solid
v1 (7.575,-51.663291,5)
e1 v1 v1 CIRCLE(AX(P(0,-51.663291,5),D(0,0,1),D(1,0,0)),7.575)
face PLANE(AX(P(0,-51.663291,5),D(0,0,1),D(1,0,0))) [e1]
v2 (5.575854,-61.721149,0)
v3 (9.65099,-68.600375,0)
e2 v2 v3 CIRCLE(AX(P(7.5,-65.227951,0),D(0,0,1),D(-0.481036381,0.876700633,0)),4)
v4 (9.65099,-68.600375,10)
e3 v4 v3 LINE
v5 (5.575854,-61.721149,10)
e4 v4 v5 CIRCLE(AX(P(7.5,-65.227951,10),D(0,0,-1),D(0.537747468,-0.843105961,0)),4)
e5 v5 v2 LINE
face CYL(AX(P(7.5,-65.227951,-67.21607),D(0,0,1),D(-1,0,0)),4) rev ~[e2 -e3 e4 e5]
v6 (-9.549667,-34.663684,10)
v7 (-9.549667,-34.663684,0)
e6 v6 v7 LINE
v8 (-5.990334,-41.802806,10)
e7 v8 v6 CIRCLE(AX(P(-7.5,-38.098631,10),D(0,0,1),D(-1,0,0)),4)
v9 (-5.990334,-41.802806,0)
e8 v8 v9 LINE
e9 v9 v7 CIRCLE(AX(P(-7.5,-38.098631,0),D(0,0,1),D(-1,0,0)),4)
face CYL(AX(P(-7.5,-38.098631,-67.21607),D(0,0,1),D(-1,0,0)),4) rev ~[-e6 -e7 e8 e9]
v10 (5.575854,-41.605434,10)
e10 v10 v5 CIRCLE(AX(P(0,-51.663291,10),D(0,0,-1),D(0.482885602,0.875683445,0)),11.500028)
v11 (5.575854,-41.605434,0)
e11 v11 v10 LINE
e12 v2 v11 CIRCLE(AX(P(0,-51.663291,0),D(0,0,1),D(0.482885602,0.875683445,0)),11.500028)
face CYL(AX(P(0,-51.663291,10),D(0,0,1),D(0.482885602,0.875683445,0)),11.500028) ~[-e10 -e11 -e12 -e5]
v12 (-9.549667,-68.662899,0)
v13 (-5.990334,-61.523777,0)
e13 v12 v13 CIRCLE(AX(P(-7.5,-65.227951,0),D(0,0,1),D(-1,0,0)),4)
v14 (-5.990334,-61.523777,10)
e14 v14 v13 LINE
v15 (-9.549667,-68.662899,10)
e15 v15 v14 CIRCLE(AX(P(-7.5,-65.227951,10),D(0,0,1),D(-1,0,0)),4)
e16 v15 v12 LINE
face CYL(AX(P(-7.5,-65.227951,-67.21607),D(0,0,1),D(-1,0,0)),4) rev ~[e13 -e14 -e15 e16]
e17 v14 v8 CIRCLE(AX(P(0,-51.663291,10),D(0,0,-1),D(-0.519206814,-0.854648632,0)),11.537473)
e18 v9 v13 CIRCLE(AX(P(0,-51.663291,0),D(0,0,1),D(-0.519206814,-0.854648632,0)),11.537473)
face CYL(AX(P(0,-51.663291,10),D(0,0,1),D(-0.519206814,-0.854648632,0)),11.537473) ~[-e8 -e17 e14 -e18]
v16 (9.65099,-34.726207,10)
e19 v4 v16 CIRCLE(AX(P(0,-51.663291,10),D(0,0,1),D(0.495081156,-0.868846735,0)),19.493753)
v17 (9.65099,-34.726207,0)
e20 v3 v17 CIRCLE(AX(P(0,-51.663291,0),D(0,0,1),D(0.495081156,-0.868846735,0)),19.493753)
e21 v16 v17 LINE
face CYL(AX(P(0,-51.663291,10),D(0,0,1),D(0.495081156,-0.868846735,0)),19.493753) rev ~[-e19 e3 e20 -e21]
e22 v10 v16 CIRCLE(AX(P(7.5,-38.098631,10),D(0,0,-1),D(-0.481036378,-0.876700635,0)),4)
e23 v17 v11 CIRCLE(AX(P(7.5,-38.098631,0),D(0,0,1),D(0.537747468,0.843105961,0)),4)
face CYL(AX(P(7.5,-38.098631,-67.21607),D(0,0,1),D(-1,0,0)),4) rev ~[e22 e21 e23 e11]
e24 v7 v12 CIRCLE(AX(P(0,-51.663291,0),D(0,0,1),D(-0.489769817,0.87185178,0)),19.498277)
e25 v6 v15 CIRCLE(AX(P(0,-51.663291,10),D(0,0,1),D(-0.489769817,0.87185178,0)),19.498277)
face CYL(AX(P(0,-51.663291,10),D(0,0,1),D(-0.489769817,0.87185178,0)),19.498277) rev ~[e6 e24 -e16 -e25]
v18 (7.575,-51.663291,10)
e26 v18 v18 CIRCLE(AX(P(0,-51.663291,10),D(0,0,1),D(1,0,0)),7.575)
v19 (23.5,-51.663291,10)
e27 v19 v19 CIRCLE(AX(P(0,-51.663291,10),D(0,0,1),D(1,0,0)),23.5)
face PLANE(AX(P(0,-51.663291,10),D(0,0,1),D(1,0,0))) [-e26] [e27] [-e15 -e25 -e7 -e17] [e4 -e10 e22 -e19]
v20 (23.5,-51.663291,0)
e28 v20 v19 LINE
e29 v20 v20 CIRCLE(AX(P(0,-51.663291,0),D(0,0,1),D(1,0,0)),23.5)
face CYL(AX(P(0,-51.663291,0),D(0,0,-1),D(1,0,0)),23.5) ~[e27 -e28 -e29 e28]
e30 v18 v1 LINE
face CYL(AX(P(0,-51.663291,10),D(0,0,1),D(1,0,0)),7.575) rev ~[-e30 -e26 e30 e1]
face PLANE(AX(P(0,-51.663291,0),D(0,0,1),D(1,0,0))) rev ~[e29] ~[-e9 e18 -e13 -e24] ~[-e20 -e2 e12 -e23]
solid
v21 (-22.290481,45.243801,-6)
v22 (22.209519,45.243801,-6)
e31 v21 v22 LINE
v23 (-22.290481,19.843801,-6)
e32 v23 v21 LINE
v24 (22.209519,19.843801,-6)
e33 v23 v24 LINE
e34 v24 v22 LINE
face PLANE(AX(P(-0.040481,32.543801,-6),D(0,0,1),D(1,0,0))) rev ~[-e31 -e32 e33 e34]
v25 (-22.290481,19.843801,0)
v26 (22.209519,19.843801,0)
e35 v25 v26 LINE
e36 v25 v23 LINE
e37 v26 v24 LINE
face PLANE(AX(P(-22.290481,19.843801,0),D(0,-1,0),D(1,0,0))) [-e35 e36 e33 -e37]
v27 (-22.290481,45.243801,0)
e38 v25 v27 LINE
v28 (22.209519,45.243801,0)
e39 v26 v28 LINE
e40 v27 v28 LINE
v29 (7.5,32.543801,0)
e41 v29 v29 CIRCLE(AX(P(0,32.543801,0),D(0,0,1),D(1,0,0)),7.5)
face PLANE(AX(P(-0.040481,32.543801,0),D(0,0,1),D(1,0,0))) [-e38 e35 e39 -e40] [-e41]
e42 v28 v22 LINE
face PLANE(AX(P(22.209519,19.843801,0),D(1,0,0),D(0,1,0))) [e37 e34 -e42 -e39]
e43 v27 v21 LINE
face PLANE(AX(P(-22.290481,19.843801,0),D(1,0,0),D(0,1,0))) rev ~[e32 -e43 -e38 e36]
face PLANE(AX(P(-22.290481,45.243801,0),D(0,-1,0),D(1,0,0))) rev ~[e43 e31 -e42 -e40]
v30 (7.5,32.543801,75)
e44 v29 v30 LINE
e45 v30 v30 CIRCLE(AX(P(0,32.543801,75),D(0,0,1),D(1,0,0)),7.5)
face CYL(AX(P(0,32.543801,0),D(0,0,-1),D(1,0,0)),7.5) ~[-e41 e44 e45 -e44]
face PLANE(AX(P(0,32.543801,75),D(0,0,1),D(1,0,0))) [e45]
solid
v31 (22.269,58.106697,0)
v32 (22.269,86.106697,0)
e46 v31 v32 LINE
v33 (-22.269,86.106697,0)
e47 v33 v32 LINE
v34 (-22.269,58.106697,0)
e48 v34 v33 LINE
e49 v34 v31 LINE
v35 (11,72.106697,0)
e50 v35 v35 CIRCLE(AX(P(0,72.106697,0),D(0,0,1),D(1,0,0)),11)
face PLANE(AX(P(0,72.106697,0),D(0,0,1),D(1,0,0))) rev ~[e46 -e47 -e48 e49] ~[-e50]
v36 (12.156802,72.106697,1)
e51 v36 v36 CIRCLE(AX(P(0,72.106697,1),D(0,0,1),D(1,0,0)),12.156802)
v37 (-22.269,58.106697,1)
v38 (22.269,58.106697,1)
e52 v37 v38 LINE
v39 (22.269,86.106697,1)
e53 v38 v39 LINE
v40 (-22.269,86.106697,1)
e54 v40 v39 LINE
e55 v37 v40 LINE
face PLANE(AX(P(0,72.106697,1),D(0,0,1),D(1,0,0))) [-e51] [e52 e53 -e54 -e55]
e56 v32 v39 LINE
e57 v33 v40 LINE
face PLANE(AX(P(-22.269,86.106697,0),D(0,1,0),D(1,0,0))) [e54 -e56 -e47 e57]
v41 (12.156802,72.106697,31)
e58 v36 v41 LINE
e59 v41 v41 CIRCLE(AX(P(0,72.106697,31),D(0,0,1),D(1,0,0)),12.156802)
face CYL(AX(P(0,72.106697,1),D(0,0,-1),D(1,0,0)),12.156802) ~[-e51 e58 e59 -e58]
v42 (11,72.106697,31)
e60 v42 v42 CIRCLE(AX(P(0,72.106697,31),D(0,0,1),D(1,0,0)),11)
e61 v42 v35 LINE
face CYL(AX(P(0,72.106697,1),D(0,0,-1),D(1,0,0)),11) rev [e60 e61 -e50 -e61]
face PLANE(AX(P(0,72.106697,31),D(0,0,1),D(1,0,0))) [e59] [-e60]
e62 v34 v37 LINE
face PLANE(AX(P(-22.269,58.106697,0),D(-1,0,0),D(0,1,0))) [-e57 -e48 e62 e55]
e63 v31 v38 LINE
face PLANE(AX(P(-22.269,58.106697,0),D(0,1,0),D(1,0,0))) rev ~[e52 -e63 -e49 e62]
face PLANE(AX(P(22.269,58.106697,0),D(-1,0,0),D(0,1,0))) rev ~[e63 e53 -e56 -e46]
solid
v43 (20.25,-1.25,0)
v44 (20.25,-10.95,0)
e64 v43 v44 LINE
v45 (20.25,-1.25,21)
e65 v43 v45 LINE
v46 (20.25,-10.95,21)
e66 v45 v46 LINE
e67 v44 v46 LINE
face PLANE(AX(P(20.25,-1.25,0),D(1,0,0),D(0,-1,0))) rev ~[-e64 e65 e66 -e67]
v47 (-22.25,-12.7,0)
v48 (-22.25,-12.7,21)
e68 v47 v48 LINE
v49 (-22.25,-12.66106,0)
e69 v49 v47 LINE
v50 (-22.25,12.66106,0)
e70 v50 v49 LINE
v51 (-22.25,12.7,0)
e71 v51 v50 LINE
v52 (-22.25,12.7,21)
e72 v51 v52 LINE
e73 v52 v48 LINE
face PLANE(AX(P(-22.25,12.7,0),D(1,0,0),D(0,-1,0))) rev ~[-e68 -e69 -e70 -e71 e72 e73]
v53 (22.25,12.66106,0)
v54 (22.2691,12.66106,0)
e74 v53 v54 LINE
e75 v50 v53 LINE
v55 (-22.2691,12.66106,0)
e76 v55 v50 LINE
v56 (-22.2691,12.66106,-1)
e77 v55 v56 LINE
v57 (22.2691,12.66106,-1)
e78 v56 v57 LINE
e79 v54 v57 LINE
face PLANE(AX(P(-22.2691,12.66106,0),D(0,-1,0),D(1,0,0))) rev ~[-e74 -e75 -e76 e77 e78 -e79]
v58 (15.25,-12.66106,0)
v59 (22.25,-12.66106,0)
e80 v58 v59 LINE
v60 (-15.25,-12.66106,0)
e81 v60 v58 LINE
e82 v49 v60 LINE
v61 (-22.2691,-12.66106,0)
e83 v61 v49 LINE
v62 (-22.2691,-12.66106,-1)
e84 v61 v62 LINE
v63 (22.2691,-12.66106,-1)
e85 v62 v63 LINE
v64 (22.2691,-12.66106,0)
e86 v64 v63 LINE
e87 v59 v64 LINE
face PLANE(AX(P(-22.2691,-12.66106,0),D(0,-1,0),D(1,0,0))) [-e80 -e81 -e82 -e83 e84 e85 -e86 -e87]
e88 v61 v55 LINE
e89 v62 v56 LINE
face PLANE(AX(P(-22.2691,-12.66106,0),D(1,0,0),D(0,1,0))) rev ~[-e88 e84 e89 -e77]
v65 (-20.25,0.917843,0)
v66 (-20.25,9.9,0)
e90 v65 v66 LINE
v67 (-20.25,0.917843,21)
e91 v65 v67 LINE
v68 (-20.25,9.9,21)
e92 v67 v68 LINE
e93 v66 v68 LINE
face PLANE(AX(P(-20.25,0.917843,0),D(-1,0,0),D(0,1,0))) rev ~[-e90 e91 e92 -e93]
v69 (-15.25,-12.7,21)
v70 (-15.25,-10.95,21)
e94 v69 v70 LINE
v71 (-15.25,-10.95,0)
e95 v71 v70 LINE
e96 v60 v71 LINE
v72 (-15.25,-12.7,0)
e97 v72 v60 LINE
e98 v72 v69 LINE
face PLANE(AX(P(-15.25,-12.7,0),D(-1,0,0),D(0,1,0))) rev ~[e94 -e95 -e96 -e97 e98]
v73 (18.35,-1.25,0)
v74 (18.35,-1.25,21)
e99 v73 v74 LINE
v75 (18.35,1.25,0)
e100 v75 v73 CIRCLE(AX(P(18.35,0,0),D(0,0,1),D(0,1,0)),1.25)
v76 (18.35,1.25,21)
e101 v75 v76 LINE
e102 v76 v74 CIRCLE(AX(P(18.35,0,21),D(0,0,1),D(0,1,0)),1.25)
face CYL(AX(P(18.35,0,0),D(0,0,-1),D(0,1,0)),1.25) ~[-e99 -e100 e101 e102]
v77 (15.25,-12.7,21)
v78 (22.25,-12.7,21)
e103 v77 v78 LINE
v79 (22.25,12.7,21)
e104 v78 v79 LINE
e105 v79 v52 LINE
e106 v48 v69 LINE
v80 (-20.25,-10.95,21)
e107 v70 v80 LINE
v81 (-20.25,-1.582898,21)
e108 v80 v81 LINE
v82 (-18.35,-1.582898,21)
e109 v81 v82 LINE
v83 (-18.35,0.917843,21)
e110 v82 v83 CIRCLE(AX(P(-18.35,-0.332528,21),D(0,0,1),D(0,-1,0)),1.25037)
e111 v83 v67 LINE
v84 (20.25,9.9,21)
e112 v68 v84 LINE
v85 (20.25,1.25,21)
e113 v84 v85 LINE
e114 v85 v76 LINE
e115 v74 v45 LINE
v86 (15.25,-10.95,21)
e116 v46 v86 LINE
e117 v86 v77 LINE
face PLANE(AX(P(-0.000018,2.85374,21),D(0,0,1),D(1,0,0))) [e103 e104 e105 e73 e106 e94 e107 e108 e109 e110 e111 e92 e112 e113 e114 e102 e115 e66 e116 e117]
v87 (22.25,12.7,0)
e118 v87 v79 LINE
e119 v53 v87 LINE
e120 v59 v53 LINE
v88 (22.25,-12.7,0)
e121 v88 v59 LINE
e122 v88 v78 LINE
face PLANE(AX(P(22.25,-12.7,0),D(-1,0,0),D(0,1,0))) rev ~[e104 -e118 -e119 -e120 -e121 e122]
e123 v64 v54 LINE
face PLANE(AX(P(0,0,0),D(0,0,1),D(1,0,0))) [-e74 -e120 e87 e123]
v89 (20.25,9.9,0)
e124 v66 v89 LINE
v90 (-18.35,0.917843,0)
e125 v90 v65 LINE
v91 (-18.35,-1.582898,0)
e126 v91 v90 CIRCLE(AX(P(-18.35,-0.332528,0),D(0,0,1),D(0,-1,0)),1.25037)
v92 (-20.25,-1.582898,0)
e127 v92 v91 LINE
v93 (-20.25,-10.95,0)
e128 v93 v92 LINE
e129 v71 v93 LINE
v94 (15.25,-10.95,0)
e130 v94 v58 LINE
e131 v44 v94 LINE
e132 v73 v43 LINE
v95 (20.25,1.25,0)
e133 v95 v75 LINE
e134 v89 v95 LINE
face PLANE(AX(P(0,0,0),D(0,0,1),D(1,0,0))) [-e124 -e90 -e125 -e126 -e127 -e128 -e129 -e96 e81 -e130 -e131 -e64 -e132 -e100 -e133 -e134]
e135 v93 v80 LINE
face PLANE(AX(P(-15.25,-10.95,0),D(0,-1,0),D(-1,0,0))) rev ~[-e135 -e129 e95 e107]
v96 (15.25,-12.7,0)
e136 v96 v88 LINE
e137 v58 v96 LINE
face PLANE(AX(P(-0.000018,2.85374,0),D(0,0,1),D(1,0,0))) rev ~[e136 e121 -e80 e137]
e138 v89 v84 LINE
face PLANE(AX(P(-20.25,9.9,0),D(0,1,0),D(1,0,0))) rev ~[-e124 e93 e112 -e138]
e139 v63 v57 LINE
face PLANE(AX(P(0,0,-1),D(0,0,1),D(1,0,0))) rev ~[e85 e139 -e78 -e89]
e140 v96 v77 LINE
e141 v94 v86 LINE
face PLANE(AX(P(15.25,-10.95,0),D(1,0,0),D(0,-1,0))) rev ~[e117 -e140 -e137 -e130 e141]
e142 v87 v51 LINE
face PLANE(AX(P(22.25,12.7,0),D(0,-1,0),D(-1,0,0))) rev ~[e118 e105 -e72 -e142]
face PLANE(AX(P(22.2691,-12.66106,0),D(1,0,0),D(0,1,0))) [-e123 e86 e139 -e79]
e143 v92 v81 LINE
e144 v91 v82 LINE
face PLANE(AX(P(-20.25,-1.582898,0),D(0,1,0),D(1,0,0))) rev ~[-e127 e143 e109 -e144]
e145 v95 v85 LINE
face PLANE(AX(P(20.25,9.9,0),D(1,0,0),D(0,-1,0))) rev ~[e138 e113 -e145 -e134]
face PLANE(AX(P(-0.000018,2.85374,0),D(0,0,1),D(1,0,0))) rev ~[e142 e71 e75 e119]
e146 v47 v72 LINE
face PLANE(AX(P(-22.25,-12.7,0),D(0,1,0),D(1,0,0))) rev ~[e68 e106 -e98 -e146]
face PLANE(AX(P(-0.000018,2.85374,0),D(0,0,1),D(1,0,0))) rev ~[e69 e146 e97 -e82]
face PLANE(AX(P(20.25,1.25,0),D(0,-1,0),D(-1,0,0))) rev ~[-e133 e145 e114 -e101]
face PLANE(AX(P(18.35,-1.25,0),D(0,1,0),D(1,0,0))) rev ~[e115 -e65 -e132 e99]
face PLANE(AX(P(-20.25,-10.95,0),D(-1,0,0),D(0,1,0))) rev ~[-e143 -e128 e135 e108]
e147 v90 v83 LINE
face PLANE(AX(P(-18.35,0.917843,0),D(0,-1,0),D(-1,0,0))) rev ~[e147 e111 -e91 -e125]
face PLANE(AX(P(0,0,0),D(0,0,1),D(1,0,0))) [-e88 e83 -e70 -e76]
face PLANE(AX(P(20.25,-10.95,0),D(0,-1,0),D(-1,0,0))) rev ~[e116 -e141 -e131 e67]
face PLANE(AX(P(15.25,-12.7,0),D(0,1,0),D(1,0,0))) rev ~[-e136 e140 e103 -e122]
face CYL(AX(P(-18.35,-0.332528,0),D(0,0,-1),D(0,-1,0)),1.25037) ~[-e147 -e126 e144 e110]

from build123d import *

# Parameters (mm, degrees)
F2_DEPTH  = 21
F0_W      = 44.5381999016
F0_H      = 25.3221206367
F3_DEPTH  = 1
F1_W      = 44.5
F1_H      = 25.4
F4_DEPTH  = 6
F5_R      = 7.5
F6_DEPTH  = 75
F7_R      = 23.5
F8_DEPTH  = 10
F10_D     = 8
F12_DEPTH = 25
F13_W     = 44.538
F13_H     = 28
F13_R     = 11
F14_DEPTH = 1
F15_R     = 12.1568017558
F15_R_2   = 11
F16_DEPTH = 30
F17_R     = 7.575
F18_DEPTH = 5


with BuildPart() as f2:
    # F1 (on Top) → F2 (new body)
    with BuildSketch(Plane.XY):
        with BuildLine():
            Line((-19.25, 9.9), (20.25, 9.9))
            Line((20.25, 9.9), (20.25, 1.25))
            Line((20.25, 1.25), (18.35, 1.25))
            ThreePointArc((18.35, 1.25), (17.1, 0), (18.35, -1.25))
            Line((18.35, -1.25), (20.25, -1.25))
            Line((20.25, -1.25), (20.25, -9.7038764507))
            Line((20.25, -9.7038764507), (20.25, -10.95))
            Line((20.25, -10.95), (15.25, -10.95))
            Line((15.25, -10.95), (15.25, -12.7))
            Line((15.25, -12.7), (22.25, -12.7))
            Line((22.25, -12.7), (22.25, 12.7))
            Line((22.25, 12.7), (-22.25, 12.7))
            Line((-22.25, 12.7), (-22.25, -12.7))
            Line((-22.25, -12.7), (-15.25, -12.7))
            Line((-15.25, -12.7), (-15.25, -10.95))
            Line((-15.25, -10.95), (-20.25, -10.95))
            Line((-20.25, -10.95), (-20.25, -9.7))
            Line((-20.25, -9.7), (-20.25, -1.5828977921))
            Line((-20.25, -1.5828977921), (-18.35, -1.5828977921))
            ThreePointArc((-18.35, -1.5828977921), (-17.0996297668, -0.3325275589), (-18.35, 0.9178426743))
            Line((-18.35, 0.9178426743), (-20.25, 0.9178426743))
            Line((-20.25, 0.9178426743), (-20.25, 9.9))
            Line((-20.25, 9.9), (-19.25, 9.9))
        make_face()
    extrude(amount=F2_DEPTH)

    # F0 (on Top) → F3 (join)
    with BuildSketch(Plane.XY):
        Rectangle(F0_W, F0_H)
    extrude(amount=-F3_DEPTH)


with BuildPart() as f4:
    # F1 (on Top) → F4 (new body)
    with BuildSketch(Plane.XY):
        with Locations((-0.040480867, 32.5438007712)):
            Rectangle(F1_W, F1_H)
    extrude(amount=-F4_DEPTH)

    # F5 (on face) → F6 (join)
    with BuildSketch(Plane.XY):
        with Locations((0, 32.5438007712)):
            Circle(F5_R)
    extrude(amount=F6_DEPTH)


with BuildPart() as f8:
    # F7 (on Top) → F8 (new body)
    with BuildSketch(Plane.XY):
        with Locations((0, -51.663291269)):
            Circle(F7_R)
    extrude(amount=F8_DEPTH)

    # F10 (through all)
    with Locations(Plane(origin=(0, 0, 0), x_dir=(1, 0, 0), z_dir=(0, 0, -1))):
        with Locations((-7.5, 38.0986313028), (7.5, 38.0986313028), (-7.5, 65.2279512353), (7.5, 65.2279512353)):
            Hole(F10_D / 2)

    # F11 (on face) → F12 (cut)
    with BuildSketch(Plane.XY.offset(10)):
        with BuildLine():
            ThreePointArc((11.5, -65.2279512353), (11.007417817, -67.1509749628), (9.6509898716, -68.6003750776))
            ThreePointArc((9.6509898716, -68.6003750776), (19.4937531902, -51.663291269), (9.6509898716, -34.7262074605))
            ThreePointArc((9.6509898716, -34.7262074605), (4.0651326687, -36.0488297473), (5.5531980506, -41.5929069315))
            ThreePointArc((5.5531980506, -41.5929069315), (11.500020945, -51.6503468012), (5.5758544768, -61.7211487022))
            ThreePointArc((5.5758544768, -61.7211487022), (9.5375742818, -61.7858165711), (11.5, -65.2279512353))
        make_face()
        with BuildLine():
            ThreePointArc((-9.5496674592, -68.6628985867), (-11.0797578572, -63.4432009211), (-5.9903344615, -61.5237765685))
            ThreePointArc((-5.9903344615, -61.5237765685), (-11.5374727433, -51.663291269), (-5.9903344615, -41.8028059695))
            ThreePointArc((-5.9903344615, -41.8028059695), (-11.0797578572, -39.8833816169), (-9.5496674592, -34.6636839514))
            ThreePointArc((-9.5496674592, -34.6636839514), (-19.4982767837, -51.663291269), (-9.5496674592, -68.6628985867))
        make_face()
    extrude(amount=-F12_DEPTH, mode=Mode.SUBTRACT)

    # F17 (on face) → F18 (cut)
    with BuildSketch(Plane.XY.offset(10)):
        with Locations((0, -51.663291269)):
            Circle(F17_R)
    extrude(amount=-F18_DEPTH, mode=Mode.SUBTRACT)


with BuildPart() as f14:
    # F13 (on Top) → F14 (new body)
    with BuildSketch(Plane.XY):
        with Locations((0, 72.1066973255)):
            Rectangle(F13_W, F13_H)
        with Locations((0, 72.1066973255)):
            Circle(F13_R, mode=Mode.SUBTRACT)
    extrude(amount=F14_DEPTH)

    # F15 (on face) → F16 (join)
    with BuildSketch(Plane.XY.offset(1)):
        with Locations((0, 72.1066973255)):
            Circle(F15_R)
        with Locations((0, 72.1066973255)):
            Circle(F15_R_2, mode=Mode.SUBTRACT)
    extrude(amount=F16_DEPTH)


solid = Compound([f2.part, f4.part, f8.part, f14.part])
